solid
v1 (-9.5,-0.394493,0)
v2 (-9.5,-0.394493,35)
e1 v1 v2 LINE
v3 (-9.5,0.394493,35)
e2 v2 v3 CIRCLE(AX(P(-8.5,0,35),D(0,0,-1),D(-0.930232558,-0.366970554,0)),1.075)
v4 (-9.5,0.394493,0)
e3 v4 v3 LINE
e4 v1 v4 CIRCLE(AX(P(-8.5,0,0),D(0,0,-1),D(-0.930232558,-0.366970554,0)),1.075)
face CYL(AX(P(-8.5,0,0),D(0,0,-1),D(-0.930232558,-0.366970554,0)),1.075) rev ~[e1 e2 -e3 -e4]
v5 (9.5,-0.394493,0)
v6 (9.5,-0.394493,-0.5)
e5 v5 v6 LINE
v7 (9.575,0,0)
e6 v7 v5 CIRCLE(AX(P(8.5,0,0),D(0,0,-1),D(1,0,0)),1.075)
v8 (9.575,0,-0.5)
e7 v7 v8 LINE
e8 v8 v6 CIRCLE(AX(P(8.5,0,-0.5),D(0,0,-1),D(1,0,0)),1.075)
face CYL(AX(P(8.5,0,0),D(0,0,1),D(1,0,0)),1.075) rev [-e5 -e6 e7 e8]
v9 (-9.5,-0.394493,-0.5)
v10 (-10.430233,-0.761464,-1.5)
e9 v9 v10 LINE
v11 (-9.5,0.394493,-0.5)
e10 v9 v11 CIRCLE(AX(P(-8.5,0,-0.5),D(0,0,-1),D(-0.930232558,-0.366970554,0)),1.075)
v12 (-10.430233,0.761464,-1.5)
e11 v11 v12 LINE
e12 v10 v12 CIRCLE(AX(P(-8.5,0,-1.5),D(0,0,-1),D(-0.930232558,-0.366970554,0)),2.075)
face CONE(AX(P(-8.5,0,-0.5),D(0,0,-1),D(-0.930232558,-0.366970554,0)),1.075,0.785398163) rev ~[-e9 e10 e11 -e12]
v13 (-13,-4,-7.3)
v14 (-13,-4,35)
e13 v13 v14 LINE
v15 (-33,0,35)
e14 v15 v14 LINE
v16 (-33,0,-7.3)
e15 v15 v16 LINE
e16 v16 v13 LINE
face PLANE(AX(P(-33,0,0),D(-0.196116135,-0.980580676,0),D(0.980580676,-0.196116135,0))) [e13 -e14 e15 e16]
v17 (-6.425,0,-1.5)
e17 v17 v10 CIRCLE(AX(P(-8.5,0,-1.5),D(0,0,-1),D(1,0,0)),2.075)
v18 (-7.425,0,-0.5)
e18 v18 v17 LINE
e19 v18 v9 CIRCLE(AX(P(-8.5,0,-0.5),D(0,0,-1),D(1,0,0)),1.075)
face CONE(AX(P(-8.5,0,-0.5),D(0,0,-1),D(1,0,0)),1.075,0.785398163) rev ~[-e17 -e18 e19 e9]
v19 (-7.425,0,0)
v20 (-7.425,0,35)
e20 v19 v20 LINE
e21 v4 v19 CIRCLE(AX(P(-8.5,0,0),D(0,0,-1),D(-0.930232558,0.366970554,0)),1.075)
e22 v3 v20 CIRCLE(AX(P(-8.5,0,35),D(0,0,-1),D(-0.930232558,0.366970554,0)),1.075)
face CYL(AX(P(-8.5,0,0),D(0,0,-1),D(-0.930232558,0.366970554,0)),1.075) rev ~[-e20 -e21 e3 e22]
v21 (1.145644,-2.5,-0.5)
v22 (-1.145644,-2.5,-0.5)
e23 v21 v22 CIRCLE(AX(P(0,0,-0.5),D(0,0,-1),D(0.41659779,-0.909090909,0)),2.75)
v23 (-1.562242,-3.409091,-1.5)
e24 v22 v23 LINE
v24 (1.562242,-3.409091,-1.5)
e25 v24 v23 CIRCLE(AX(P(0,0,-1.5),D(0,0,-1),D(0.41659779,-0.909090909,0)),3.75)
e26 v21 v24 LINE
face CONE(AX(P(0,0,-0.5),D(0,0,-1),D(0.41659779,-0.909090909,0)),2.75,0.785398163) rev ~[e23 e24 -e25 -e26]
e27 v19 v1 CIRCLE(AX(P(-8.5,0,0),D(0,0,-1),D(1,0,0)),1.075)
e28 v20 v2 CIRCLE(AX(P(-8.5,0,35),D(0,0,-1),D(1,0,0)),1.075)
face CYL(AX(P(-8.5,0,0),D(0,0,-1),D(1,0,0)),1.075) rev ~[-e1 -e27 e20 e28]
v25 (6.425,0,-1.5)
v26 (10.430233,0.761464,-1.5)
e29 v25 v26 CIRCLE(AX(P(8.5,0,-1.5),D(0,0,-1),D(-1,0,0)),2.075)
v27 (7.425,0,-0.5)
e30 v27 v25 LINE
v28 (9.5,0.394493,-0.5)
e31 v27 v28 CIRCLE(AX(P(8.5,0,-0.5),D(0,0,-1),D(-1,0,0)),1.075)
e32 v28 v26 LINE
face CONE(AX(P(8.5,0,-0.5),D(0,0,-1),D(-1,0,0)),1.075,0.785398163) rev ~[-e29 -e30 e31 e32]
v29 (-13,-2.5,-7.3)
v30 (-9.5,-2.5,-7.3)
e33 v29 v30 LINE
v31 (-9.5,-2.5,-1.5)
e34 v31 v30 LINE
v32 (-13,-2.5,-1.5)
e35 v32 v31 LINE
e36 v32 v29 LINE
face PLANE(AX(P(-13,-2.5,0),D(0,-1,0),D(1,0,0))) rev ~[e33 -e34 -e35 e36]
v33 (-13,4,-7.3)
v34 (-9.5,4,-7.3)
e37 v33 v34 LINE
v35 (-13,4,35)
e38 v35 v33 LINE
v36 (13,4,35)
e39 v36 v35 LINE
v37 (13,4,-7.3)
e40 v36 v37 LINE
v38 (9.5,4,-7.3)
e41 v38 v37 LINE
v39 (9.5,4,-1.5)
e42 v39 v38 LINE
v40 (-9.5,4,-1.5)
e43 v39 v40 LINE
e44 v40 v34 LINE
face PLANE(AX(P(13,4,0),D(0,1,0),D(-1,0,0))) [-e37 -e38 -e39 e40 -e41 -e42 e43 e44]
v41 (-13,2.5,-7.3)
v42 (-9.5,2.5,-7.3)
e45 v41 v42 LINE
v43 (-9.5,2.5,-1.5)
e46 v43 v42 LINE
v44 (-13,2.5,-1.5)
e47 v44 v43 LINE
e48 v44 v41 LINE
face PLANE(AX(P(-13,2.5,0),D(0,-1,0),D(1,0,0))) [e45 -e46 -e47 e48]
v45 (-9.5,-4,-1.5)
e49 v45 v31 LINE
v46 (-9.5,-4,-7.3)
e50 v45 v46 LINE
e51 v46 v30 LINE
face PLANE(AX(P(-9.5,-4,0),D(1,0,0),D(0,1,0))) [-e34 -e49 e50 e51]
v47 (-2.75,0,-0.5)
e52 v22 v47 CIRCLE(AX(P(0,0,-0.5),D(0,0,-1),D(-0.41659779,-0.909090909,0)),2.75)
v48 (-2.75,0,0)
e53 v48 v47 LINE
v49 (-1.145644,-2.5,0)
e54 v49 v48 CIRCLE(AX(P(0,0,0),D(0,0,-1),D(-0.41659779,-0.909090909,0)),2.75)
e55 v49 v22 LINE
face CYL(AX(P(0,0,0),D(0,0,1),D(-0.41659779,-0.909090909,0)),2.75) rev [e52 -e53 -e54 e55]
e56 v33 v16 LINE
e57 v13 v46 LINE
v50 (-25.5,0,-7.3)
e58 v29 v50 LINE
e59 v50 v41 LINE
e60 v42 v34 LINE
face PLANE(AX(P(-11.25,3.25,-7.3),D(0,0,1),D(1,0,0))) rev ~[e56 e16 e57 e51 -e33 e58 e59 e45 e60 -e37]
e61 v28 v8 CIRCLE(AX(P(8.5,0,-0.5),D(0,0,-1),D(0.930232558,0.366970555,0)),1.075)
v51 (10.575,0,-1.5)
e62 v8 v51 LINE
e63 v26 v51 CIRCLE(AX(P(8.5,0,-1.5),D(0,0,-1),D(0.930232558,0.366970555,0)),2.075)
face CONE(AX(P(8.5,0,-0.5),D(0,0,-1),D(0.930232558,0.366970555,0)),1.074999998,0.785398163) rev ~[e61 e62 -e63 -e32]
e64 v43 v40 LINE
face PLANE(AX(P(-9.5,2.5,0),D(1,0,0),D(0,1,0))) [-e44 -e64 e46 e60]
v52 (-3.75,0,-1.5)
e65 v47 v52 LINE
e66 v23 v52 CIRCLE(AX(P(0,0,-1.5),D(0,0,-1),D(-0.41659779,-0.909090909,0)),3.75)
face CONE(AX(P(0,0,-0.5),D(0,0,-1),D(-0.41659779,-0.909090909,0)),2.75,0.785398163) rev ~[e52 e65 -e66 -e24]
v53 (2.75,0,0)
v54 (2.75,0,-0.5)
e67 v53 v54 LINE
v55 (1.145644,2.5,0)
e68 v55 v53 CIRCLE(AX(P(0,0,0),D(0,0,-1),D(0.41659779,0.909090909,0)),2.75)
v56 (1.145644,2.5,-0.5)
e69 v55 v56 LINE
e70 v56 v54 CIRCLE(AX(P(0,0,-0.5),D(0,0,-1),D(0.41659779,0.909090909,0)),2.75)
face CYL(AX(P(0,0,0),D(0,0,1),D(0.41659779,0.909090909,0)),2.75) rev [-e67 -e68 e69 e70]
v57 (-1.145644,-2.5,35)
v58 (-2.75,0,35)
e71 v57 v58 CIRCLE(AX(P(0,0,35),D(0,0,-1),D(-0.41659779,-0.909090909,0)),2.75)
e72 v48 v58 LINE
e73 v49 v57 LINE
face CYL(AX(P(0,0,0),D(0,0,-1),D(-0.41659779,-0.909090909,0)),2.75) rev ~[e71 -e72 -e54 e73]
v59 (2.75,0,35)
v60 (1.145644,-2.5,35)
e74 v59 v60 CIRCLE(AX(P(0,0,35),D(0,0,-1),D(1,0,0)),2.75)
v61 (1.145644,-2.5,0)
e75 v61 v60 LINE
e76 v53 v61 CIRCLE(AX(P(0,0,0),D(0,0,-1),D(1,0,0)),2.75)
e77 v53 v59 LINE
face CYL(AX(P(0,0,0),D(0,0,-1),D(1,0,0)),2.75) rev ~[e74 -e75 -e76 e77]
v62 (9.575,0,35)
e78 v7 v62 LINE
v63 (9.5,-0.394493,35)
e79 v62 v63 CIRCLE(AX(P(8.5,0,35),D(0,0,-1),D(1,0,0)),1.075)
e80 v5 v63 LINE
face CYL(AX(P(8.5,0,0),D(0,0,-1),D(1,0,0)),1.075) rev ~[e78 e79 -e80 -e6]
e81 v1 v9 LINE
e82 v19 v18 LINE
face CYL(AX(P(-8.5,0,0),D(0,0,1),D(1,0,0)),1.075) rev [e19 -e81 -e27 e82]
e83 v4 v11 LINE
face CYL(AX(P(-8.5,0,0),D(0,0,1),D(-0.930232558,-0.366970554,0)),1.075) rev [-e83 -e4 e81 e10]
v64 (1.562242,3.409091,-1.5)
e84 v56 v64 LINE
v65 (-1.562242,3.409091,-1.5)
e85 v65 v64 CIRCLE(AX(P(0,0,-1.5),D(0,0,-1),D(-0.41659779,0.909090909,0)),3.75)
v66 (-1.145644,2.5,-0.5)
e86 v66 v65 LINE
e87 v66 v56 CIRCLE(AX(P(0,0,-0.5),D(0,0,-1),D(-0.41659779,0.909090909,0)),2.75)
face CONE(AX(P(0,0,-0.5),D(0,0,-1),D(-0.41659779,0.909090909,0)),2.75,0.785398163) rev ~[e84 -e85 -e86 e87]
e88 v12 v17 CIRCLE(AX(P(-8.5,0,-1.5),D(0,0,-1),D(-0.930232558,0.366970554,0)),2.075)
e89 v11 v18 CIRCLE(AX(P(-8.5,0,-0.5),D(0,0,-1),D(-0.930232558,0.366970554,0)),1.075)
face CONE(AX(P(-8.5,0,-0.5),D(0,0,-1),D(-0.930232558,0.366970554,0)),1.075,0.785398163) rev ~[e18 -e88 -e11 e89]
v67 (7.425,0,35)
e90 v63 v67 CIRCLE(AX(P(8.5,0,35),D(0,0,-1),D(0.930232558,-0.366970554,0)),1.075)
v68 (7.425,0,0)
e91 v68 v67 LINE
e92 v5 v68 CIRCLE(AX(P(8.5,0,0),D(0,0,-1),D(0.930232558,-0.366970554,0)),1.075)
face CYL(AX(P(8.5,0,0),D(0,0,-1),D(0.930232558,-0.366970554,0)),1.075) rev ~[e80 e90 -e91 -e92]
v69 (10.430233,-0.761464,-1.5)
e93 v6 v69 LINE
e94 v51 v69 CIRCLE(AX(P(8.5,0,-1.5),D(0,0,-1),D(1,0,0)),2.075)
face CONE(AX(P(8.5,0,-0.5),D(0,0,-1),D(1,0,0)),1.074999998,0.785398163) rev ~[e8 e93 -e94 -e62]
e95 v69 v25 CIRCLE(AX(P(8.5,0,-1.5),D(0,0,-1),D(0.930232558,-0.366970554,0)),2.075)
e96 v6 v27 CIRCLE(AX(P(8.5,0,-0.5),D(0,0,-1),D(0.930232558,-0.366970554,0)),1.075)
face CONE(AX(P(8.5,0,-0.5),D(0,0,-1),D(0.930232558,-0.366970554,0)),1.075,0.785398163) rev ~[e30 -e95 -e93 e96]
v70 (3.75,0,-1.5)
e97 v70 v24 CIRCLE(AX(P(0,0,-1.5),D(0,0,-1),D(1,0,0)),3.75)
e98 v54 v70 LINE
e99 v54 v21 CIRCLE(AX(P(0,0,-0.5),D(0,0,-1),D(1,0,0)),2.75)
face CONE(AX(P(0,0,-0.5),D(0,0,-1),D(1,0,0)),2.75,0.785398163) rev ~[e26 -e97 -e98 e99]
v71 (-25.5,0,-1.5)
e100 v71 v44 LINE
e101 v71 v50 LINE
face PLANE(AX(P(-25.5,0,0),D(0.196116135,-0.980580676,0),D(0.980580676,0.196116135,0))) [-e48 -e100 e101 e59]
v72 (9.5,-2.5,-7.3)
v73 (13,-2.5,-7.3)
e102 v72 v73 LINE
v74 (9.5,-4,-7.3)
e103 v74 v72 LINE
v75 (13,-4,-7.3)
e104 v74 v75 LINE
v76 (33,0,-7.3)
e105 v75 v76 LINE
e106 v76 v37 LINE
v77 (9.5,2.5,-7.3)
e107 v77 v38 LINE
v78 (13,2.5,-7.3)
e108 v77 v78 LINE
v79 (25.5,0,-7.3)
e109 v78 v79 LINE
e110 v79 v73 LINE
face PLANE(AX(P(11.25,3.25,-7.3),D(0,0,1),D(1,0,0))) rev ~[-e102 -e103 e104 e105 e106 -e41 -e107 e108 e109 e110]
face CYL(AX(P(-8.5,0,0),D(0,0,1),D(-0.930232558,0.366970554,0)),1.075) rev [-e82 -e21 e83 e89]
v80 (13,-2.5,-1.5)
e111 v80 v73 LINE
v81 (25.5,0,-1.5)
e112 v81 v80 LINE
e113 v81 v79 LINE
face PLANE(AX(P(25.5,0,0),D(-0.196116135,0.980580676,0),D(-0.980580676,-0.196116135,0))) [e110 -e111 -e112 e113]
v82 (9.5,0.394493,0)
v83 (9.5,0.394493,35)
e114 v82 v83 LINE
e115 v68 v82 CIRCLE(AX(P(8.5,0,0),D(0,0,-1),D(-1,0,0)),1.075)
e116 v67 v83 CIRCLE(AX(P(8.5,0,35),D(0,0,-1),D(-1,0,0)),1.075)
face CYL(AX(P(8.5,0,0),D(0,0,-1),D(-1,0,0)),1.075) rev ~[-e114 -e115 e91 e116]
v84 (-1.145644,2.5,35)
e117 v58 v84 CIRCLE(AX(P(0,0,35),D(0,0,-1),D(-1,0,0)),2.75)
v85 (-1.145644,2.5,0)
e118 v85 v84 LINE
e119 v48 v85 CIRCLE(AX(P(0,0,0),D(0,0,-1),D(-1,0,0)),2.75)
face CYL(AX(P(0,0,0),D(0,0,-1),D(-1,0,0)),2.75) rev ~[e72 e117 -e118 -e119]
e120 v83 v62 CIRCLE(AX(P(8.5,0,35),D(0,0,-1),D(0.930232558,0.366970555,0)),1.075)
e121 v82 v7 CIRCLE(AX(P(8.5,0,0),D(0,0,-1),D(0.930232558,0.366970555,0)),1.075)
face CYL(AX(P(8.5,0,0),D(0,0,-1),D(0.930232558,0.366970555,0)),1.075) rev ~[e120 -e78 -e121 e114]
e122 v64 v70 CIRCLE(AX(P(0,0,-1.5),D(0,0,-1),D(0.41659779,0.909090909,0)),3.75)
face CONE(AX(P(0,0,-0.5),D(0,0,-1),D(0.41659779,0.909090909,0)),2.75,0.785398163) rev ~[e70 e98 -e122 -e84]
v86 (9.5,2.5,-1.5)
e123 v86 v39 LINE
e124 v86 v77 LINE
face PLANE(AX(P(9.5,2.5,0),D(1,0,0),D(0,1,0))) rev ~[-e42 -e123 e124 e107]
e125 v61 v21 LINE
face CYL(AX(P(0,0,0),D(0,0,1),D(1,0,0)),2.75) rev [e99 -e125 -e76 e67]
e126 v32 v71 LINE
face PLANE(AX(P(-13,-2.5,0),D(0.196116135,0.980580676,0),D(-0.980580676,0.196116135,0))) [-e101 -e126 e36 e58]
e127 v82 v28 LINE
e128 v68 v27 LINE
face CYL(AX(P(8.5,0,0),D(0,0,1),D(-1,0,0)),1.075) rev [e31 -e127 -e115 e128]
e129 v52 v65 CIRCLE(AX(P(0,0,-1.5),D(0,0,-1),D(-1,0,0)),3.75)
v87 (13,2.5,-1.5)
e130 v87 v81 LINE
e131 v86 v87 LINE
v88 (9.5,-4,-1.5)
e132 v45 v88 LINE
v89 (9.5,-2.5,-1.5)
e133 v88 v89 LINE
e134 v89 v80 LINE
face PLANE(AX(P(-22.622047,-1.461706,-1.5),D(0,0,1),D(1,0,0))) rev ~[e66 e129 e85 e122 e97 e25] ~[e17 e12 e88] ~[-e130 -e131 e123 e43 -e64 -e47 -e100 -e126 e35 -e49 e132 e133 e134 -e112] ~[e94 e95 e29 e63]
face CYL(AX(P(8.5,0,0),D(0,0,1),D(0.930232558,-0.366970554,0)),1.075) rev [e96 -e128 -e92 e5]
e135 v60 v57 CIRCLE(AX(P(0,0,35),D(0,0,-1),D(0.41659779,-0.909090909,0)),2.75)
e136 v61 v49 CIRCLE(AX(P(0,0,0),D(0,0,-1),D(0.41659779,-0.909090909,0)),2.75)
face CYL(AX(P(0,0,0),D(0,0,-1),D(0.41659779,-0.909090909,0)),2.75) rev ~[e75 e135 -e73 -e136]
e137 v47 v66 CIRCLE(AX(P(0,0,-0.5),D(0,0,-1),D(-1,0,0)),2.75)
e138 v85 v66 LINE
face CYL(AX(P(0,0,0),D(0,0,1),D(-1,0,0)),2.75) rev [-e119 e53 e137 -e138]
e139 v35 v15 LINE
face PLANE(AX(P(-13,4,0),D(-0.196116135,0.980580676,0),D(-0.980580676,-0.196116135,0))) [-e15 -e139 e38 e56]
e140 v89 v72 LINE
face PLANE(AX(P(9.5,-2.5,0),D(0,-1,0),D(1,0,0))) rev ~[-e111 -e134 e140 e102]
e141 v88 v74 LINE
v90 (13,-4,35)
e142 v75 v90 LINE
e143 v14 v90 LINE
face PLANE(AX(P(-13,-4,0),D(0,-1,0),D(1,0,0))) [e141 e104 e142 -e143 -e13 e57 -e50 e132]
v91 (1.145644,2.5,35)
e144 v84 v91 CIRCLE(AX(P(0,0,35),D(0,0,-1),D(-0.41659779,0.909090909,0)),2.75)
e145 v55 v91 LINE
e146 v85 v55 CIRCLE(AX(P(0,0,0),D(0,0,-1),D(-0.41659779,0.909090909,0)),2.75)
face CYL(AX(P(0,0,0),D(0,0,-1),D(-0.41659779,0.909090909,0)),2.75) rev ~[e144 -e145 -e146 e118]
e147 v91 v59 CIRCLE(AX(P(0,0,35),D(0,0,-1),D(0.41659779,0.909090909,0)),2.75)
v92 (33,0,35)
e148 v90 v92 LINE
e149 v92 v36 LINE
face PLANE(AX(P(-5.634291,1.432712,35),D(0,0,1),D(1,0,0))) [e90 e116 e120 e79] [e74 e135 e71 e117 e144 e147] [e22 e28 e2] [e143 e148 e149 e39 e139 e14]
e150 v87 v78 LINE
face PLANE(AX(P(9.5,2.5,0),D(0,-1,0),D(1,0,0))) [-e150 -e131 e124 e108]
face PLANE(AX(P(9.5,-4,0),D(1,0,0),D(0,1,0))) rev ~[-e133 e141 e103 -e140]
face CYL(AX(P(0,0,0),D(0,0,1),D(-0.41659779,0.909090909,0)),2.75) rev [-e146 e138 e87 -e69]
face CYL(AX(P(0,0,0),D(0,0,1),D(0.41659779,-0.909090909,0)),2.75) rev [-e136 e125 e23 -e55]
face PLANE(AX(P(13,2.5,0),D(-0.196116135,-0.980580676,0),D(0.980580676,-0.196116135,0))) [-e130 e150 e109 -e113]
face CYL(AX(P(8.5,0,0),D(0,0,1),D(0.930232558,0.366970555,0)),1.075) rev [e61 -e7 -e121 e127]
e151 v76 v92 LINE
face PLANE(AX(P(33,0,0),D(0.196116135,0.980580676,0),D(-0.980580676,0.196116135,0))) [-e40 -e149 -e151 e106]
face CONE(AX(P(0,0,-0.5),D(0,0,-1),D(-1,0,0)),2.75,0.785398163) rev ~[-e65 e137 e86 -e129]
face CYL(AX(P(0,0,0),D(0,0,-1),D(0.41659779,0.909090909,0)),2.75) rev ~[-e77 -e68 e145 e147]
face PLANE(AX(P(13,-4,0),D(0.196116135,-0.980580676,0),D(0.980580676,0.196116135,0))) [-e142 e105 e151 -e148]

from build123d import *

# Parameters (mm, degrees)
F0_W     = 3.5
F0_H     = 1.5
F1_DEPTH = 35
F2_DEPTH = 1.5
F3_SIZE  = 1
F4_DEPTH = 7.3


with BuildPart() as f1:
    # F0 (on Top) → F1 (new body)
    with BuildSketch(Plane.XY):
        with BuildLine():
            ThreePointArc((-9.5, 0.394493346), (-8.2992202699, 1.0560835668), (-7.425, 0))
            Line((-7.425, 0), (-2.75, 0))
            ThreePointArc((-2.75, 0), (-2.314413618, 1.4852574204), (-1.1456439237, 2.5))
            Line((-1.1456439237, 2.5), (-9.5, 2.5))
            Line((-9.5, 2.5), (-9.5, 0.394493346))
        make_face()
        with BuildLine():
            ThreePointArc((-9.5, -0.394493346), (-9.575, 0), (-9.5, 0.394493346))
            Line((-9.5, 0.394493346), (-9.5, 2.5))
            Line((-9.5, 2.5), (-13, 2.5))
            Line((-13, 2.5), (-13, 0))
            Line((-13, 0), (-13, -2.5))
            Line((-13, -2.5), (-9.5, -2.5))
            Line((-9.5, -2.5), (-9.5, -0.394493346))
        make_face()
        with BuildLine():
            Line((-2.75, 0), (-7.425, 0))
            ThreePointArc((-7.425, 0), (-8.2992202699, -1.0560835668), (-9.5, -0.394493346))
            Line((-9.5, -0.394493346), (-9.5, -2.5))
            Line((-9.5, -2.5), (-1.1456439237, -2.5))
            ThreePointArc((-1.1456439237, -2.5), (-2.314413618, -1.4852574204), (-2.75, 0))
        make_face()
        Polygon((-13, -4), (-13, -2.5), (-25.5, 0), (-33, 0), align=None)
        Polygon((-25.5, 0), (-13, 2.5), (-13, 4), (-33, 0), align=None)
        Polygon((13, -2.5), (13, -4), (33, 0), (25.5, 0), align=None)
        Polygon((33, 0), (13, 4), (13, 2.5), (25.5, 0), align=None)
        Polygon((-25.5, 0), (-13, -2.5), (-13, 0), align=None)
        Polygon((-13, 0), (-13, 2.5), (-25.5, 0), align=None)
        with Locations((-11.25, 3.25)):
            Rectangle(F0_W, F0_H)
        with BuildLine():
            Line((-9.5, 4), (-9.5, 2.5))
            Line((-9.5, 2.5), (-1.1456439237, 2.5))
            ThreePointArc((-1.1456439237, 2.5), (0, 2.75), (1.1456439237, 2.5))
            Line((1.1456439237, 2.5), (9.5, 2.5))
            Line((9.5, 2.5), (9.5, 4))
            Line((9.5, 4), (-9.5, 4))
        make_face()
        with Locations((11.25, 3.25)):
            Rectangle(F0_W, F0_H)
        with Locations((11.25, -3.25)):
            Rectangle(F0_W, F0_H)
        with BuildLine():
            Line((-1.1456439237, -2.5), (-9.5, -2.5))
            Line((-9.5, -2.5), (-9.5, -4))
            Line((-9.5, -4), (9.5, -4))
            Line((9.5, -4), (9.5, -2.5))
            Line((9.5, -2.5), (1.1456439237, -2.5))
            ThreePointArc((1.1456439237, -2.5), (0, -2.75), (-1.1456439237, -2.5))
        make_face()
        with Locations((-11.25, -3.25)):
            Rectangle(F0_W, F0_H)
        Polygon((13, 0), (13, -2.5), (25.5, 0), align=None)
        Polygon((25.5, 0), (13, 2.5), (13, 0), align=None)
        with BuildLine():
            Line((9.5, 2.5), (9.5, 0.394493346))
            ThreePointArc((9.5, 0.394493346), (9.5560835668, 0.2007797301), (9.575, 0))
            ThreePointArc((9.575, 0), (9.5560835668, -0.2007797301), (9.5, -0.394493346))
            Line((9.5, -0.394493346), (9.5, -2.5))
            Line((9.5, -2.5), (13, -2.5))
            Line((13, -2.5), (13, 0))
            Line((13, 0), (13, 2.5))
            Line((13, 2.5), (9.5, 2.5))
        make_face()
        with BuildLine():
            ThreePointArc((1.1456439237, 2.5), (2.314413618, 1.4852574204), (2.75, 0))
            Line((2.75, 0), (7.425, 0))
            ThreePointArc((7.425, 0), (8.2992202699, 1.0560835668), (9.5, 0.394493346))
            Line((9.5, 0.394493346), (9.5, 2.5))
            Line((9.5, 2.5), (1.1456439237, 2.5))
        make_face()
        with BuildLine():
            Line((7.425, 0), (2.75, 0))
            ThreePointArc((2.75, 0), (2.314413618, -1.4852574204), (1.1456439237, -2.5))
            Line((1.1456439237, -2.5), (9.5, -2.5))
            Line((9.5, -2.5), (9.5, -0.394493346))
            ThreePointArc((9.5, -0.394493346), (8.2992202699, -1.0560835668), (7.425, 0))
        make_face()
    extrude(amount=F1_DEPTH)

    # F0 (on Top) → F2 (join)
    with BuildSketch(Plane.XY):
        Polygon((-13, -4), (-13, -2.5), (-25.5, 0), (-33, 0), align=None)
        Polygon((-25.5, 0), (-13, 2.5), (-13, 4), (-33, 0), align=None)
        with Locations((-11.25, 3.25)):
            Rectangle(F0_W, F0_H)
        with BuildLine():
            Line((-9.5, 4), (-9.5, 2.5))
            Line((-9.5, 2.5), (-1.1456439237, 2.5))
            ThreePointArc((-1.1456439237, 2.5), (0, 2.75), (1.1456439237, 2.5))
            Line((1.1456439237, 2.5), (9.5, 2.5))
            Line((9.5, 2.5), (9.5, 4))
            Line((9.5, 4), (-9.5, 4))
        make_face()
        with Locations((11.25, 3.25)):
            Rectangle(F0_W, F0_H)
        Polygon((-13, 0), (-13, 2.5), (-25.5, 0), align=None)
        Polygon((-25.5, 0), (-13, -2.5), (-13, 0), align=None)
        with BuildLine():
            ThreePointArc((-9.5, 0.394493346), (-8.2992202699, 1.0560835668), (-7.425, 0))
            Line((-7.425, 0), (-2.75, 0))
            ThreePointArc((-2.75, 0), (-2.314413618, 1.4852574204), (-1.1456439237, 2.5))
            Line((-1.1456439237, 2.5), (-9.5, 2.5))
            Line((-9.5, 2.5), (-9.5, 0.394493346))
        make_face()
        with BuildLine():
            ThreePointArc((-9.5, -0.394493346), (-9.575, 0), (-9.5, 0.394493346))
            Line((-9.5, 0.394493346), (-9.5, 2.5))
            Line((-9.5, 2.5), (-13, 2.5))
            Line((-13, 2.5), (-13, 0))
            Line((-13, 0), (-13, -2.5))
            Line((-13, -2.5), (-9.5, -2.5))
            Line((-9.5, -2.5), (-9.5, -0.394493346))
        make_face()
        with BuildLine():
            Line((-2.75, 0), (-7.425, 0))
            ThreePointArc((-7.425, 0), (-8.2992202699, -1.0560835668), (-9.5, -0.394493346))
            Line((-9.5, -0.394493346), (-9.5, -2.5))
            Line((-9.5, -2.5), (-1.1456439237, -2.5))
            ThreePointArc((-1.1456439237, -2.5), (-2.314413618, -1.4852574204), (-2.75, 0))
        make_face()
        with Locations((11.25, -3.25)):
            Rectangle(F0_W, F0_H)
        with BuildLine():
            Line((-1.1456439237, -2.5), (-9.5, -2.5))
            Line((-9.5, -2.5), (-9.5, -4))
            Line((-9.5, -4), (9.5, -4))
            Line((9.5, -4), (9.5, -2.5))
            Line((9.5, -2.5), (1.1456439237, -2.5))
            ThreePointArc((1.1456439237, -2.5), (0, -2.75), (-1.1456439237, -2.5))
        make_face()
        with Locations((-11.25, -3.25)):
            Rectangle(F0_W, F0_H)
        Polygon((13, -2.5), (13, -4), (33, 0), (25.5, 0), align=None)
        Polygon((13, 0), (13, -2.5), (25.5, 0), align=None)
        Polygon((25.5, 0), (13, 2.5), (13, 0), align=None)
        Polygon((33, 0), (13, 4), (13, 2.5), (25.5, 0), align=None)
        with BuildLine():
            ThreePointArc((1.1456439237, 2.5), (2.314413618, 1.4852574204), (2.75, 0))
            Line((2.75, 0), (7.425, 0))
            ThreePointArc((7.425, 0), (8.2992202699, 1.0560835668), (9.5, 0.394493346))
            Line((9.5, 0.394493346), (9.5, 2.5))
            Line((9.5, 2.5), (1.1456439237, 2.5))
        make_face()
        with BuildLine():
            Line((7.425, 0), (2.75, 0))
            ThreePointArc((2.75, 0), (2.314413618, -1.4852574204), (1.1456439237, -2.5))
            Line((1.1456439237, -2.5), (9.5, -2.5))
            Line((9.5, -2.5), (9.5, -0.394493346))
            ThreePointArc((9.5, -0.394493346), (8.2992202699, -1.0560835668), (7.425, 0))
        make_face()
        with BuildLine():
            Line((9.5, 2.5), (9.5, 0.394493346))
            ThreePointArc((9.5, 0.394493346), (9.5560835668, 0.2007797301), (9.575, 0))
            ThreePointArc((9.575, 0), (9.5560835668, -0.2007797301), (9.5, -0.394493346))
            Line((9.5, -0.394493346), (9.5, -2.5))
            Line((9.5, -2.5), (13, -2.5))
            Line((13, -2.5), (13, 0))
            Line((13, 0), (13, 2.5))
            Line((13, 2.5), (9.5, 2.5))
        make_face()
    extrude(amount=-F2_DEPTH)

    # F3
    f3_edges = [f1.edges().sort_by_distance(p)[0] for p in [
        (-9.575, 0, -1.5),
        (7.5, -0.394493, -1.5),
        (1.145644, -2.5, -1.5),
    ]]
    chamfer(f3_edges, length=F3_SIZE)

    # F0 (on Top) → F4 (join)
    with BuildSketch(Plane.XY):
        with Locations((-11.25, 3.25)):
            Rectangle(F0_W, F0_H)
        with Locations((11.25, 3.25)):
            Rectangle(F0_W, F0_H)
        Polygon((-25.5, 0), (-13, 2.5), (-13, 4), (-33, 0), align=None)
        Polygon((-13, -4), (-13, -2.5), (-25.5, 0), (-33, 0), align=None)
        with Locations((11.25, -3.25)):
            Rectangle(F0_W, F0_H)
        with Locations((-11.25, -3.25)):
            Rectangle(F0_W, F0_H)
        Polygon((33, 0), (13, 4), (13, 2.5), (25.5, 0), align=None)
        Polygon((13, -2.5), (13, -4), (33, 0), (25.5, 0), align=None)
    extrude(amount=-F4_DEPTH)


solid = f1.part
